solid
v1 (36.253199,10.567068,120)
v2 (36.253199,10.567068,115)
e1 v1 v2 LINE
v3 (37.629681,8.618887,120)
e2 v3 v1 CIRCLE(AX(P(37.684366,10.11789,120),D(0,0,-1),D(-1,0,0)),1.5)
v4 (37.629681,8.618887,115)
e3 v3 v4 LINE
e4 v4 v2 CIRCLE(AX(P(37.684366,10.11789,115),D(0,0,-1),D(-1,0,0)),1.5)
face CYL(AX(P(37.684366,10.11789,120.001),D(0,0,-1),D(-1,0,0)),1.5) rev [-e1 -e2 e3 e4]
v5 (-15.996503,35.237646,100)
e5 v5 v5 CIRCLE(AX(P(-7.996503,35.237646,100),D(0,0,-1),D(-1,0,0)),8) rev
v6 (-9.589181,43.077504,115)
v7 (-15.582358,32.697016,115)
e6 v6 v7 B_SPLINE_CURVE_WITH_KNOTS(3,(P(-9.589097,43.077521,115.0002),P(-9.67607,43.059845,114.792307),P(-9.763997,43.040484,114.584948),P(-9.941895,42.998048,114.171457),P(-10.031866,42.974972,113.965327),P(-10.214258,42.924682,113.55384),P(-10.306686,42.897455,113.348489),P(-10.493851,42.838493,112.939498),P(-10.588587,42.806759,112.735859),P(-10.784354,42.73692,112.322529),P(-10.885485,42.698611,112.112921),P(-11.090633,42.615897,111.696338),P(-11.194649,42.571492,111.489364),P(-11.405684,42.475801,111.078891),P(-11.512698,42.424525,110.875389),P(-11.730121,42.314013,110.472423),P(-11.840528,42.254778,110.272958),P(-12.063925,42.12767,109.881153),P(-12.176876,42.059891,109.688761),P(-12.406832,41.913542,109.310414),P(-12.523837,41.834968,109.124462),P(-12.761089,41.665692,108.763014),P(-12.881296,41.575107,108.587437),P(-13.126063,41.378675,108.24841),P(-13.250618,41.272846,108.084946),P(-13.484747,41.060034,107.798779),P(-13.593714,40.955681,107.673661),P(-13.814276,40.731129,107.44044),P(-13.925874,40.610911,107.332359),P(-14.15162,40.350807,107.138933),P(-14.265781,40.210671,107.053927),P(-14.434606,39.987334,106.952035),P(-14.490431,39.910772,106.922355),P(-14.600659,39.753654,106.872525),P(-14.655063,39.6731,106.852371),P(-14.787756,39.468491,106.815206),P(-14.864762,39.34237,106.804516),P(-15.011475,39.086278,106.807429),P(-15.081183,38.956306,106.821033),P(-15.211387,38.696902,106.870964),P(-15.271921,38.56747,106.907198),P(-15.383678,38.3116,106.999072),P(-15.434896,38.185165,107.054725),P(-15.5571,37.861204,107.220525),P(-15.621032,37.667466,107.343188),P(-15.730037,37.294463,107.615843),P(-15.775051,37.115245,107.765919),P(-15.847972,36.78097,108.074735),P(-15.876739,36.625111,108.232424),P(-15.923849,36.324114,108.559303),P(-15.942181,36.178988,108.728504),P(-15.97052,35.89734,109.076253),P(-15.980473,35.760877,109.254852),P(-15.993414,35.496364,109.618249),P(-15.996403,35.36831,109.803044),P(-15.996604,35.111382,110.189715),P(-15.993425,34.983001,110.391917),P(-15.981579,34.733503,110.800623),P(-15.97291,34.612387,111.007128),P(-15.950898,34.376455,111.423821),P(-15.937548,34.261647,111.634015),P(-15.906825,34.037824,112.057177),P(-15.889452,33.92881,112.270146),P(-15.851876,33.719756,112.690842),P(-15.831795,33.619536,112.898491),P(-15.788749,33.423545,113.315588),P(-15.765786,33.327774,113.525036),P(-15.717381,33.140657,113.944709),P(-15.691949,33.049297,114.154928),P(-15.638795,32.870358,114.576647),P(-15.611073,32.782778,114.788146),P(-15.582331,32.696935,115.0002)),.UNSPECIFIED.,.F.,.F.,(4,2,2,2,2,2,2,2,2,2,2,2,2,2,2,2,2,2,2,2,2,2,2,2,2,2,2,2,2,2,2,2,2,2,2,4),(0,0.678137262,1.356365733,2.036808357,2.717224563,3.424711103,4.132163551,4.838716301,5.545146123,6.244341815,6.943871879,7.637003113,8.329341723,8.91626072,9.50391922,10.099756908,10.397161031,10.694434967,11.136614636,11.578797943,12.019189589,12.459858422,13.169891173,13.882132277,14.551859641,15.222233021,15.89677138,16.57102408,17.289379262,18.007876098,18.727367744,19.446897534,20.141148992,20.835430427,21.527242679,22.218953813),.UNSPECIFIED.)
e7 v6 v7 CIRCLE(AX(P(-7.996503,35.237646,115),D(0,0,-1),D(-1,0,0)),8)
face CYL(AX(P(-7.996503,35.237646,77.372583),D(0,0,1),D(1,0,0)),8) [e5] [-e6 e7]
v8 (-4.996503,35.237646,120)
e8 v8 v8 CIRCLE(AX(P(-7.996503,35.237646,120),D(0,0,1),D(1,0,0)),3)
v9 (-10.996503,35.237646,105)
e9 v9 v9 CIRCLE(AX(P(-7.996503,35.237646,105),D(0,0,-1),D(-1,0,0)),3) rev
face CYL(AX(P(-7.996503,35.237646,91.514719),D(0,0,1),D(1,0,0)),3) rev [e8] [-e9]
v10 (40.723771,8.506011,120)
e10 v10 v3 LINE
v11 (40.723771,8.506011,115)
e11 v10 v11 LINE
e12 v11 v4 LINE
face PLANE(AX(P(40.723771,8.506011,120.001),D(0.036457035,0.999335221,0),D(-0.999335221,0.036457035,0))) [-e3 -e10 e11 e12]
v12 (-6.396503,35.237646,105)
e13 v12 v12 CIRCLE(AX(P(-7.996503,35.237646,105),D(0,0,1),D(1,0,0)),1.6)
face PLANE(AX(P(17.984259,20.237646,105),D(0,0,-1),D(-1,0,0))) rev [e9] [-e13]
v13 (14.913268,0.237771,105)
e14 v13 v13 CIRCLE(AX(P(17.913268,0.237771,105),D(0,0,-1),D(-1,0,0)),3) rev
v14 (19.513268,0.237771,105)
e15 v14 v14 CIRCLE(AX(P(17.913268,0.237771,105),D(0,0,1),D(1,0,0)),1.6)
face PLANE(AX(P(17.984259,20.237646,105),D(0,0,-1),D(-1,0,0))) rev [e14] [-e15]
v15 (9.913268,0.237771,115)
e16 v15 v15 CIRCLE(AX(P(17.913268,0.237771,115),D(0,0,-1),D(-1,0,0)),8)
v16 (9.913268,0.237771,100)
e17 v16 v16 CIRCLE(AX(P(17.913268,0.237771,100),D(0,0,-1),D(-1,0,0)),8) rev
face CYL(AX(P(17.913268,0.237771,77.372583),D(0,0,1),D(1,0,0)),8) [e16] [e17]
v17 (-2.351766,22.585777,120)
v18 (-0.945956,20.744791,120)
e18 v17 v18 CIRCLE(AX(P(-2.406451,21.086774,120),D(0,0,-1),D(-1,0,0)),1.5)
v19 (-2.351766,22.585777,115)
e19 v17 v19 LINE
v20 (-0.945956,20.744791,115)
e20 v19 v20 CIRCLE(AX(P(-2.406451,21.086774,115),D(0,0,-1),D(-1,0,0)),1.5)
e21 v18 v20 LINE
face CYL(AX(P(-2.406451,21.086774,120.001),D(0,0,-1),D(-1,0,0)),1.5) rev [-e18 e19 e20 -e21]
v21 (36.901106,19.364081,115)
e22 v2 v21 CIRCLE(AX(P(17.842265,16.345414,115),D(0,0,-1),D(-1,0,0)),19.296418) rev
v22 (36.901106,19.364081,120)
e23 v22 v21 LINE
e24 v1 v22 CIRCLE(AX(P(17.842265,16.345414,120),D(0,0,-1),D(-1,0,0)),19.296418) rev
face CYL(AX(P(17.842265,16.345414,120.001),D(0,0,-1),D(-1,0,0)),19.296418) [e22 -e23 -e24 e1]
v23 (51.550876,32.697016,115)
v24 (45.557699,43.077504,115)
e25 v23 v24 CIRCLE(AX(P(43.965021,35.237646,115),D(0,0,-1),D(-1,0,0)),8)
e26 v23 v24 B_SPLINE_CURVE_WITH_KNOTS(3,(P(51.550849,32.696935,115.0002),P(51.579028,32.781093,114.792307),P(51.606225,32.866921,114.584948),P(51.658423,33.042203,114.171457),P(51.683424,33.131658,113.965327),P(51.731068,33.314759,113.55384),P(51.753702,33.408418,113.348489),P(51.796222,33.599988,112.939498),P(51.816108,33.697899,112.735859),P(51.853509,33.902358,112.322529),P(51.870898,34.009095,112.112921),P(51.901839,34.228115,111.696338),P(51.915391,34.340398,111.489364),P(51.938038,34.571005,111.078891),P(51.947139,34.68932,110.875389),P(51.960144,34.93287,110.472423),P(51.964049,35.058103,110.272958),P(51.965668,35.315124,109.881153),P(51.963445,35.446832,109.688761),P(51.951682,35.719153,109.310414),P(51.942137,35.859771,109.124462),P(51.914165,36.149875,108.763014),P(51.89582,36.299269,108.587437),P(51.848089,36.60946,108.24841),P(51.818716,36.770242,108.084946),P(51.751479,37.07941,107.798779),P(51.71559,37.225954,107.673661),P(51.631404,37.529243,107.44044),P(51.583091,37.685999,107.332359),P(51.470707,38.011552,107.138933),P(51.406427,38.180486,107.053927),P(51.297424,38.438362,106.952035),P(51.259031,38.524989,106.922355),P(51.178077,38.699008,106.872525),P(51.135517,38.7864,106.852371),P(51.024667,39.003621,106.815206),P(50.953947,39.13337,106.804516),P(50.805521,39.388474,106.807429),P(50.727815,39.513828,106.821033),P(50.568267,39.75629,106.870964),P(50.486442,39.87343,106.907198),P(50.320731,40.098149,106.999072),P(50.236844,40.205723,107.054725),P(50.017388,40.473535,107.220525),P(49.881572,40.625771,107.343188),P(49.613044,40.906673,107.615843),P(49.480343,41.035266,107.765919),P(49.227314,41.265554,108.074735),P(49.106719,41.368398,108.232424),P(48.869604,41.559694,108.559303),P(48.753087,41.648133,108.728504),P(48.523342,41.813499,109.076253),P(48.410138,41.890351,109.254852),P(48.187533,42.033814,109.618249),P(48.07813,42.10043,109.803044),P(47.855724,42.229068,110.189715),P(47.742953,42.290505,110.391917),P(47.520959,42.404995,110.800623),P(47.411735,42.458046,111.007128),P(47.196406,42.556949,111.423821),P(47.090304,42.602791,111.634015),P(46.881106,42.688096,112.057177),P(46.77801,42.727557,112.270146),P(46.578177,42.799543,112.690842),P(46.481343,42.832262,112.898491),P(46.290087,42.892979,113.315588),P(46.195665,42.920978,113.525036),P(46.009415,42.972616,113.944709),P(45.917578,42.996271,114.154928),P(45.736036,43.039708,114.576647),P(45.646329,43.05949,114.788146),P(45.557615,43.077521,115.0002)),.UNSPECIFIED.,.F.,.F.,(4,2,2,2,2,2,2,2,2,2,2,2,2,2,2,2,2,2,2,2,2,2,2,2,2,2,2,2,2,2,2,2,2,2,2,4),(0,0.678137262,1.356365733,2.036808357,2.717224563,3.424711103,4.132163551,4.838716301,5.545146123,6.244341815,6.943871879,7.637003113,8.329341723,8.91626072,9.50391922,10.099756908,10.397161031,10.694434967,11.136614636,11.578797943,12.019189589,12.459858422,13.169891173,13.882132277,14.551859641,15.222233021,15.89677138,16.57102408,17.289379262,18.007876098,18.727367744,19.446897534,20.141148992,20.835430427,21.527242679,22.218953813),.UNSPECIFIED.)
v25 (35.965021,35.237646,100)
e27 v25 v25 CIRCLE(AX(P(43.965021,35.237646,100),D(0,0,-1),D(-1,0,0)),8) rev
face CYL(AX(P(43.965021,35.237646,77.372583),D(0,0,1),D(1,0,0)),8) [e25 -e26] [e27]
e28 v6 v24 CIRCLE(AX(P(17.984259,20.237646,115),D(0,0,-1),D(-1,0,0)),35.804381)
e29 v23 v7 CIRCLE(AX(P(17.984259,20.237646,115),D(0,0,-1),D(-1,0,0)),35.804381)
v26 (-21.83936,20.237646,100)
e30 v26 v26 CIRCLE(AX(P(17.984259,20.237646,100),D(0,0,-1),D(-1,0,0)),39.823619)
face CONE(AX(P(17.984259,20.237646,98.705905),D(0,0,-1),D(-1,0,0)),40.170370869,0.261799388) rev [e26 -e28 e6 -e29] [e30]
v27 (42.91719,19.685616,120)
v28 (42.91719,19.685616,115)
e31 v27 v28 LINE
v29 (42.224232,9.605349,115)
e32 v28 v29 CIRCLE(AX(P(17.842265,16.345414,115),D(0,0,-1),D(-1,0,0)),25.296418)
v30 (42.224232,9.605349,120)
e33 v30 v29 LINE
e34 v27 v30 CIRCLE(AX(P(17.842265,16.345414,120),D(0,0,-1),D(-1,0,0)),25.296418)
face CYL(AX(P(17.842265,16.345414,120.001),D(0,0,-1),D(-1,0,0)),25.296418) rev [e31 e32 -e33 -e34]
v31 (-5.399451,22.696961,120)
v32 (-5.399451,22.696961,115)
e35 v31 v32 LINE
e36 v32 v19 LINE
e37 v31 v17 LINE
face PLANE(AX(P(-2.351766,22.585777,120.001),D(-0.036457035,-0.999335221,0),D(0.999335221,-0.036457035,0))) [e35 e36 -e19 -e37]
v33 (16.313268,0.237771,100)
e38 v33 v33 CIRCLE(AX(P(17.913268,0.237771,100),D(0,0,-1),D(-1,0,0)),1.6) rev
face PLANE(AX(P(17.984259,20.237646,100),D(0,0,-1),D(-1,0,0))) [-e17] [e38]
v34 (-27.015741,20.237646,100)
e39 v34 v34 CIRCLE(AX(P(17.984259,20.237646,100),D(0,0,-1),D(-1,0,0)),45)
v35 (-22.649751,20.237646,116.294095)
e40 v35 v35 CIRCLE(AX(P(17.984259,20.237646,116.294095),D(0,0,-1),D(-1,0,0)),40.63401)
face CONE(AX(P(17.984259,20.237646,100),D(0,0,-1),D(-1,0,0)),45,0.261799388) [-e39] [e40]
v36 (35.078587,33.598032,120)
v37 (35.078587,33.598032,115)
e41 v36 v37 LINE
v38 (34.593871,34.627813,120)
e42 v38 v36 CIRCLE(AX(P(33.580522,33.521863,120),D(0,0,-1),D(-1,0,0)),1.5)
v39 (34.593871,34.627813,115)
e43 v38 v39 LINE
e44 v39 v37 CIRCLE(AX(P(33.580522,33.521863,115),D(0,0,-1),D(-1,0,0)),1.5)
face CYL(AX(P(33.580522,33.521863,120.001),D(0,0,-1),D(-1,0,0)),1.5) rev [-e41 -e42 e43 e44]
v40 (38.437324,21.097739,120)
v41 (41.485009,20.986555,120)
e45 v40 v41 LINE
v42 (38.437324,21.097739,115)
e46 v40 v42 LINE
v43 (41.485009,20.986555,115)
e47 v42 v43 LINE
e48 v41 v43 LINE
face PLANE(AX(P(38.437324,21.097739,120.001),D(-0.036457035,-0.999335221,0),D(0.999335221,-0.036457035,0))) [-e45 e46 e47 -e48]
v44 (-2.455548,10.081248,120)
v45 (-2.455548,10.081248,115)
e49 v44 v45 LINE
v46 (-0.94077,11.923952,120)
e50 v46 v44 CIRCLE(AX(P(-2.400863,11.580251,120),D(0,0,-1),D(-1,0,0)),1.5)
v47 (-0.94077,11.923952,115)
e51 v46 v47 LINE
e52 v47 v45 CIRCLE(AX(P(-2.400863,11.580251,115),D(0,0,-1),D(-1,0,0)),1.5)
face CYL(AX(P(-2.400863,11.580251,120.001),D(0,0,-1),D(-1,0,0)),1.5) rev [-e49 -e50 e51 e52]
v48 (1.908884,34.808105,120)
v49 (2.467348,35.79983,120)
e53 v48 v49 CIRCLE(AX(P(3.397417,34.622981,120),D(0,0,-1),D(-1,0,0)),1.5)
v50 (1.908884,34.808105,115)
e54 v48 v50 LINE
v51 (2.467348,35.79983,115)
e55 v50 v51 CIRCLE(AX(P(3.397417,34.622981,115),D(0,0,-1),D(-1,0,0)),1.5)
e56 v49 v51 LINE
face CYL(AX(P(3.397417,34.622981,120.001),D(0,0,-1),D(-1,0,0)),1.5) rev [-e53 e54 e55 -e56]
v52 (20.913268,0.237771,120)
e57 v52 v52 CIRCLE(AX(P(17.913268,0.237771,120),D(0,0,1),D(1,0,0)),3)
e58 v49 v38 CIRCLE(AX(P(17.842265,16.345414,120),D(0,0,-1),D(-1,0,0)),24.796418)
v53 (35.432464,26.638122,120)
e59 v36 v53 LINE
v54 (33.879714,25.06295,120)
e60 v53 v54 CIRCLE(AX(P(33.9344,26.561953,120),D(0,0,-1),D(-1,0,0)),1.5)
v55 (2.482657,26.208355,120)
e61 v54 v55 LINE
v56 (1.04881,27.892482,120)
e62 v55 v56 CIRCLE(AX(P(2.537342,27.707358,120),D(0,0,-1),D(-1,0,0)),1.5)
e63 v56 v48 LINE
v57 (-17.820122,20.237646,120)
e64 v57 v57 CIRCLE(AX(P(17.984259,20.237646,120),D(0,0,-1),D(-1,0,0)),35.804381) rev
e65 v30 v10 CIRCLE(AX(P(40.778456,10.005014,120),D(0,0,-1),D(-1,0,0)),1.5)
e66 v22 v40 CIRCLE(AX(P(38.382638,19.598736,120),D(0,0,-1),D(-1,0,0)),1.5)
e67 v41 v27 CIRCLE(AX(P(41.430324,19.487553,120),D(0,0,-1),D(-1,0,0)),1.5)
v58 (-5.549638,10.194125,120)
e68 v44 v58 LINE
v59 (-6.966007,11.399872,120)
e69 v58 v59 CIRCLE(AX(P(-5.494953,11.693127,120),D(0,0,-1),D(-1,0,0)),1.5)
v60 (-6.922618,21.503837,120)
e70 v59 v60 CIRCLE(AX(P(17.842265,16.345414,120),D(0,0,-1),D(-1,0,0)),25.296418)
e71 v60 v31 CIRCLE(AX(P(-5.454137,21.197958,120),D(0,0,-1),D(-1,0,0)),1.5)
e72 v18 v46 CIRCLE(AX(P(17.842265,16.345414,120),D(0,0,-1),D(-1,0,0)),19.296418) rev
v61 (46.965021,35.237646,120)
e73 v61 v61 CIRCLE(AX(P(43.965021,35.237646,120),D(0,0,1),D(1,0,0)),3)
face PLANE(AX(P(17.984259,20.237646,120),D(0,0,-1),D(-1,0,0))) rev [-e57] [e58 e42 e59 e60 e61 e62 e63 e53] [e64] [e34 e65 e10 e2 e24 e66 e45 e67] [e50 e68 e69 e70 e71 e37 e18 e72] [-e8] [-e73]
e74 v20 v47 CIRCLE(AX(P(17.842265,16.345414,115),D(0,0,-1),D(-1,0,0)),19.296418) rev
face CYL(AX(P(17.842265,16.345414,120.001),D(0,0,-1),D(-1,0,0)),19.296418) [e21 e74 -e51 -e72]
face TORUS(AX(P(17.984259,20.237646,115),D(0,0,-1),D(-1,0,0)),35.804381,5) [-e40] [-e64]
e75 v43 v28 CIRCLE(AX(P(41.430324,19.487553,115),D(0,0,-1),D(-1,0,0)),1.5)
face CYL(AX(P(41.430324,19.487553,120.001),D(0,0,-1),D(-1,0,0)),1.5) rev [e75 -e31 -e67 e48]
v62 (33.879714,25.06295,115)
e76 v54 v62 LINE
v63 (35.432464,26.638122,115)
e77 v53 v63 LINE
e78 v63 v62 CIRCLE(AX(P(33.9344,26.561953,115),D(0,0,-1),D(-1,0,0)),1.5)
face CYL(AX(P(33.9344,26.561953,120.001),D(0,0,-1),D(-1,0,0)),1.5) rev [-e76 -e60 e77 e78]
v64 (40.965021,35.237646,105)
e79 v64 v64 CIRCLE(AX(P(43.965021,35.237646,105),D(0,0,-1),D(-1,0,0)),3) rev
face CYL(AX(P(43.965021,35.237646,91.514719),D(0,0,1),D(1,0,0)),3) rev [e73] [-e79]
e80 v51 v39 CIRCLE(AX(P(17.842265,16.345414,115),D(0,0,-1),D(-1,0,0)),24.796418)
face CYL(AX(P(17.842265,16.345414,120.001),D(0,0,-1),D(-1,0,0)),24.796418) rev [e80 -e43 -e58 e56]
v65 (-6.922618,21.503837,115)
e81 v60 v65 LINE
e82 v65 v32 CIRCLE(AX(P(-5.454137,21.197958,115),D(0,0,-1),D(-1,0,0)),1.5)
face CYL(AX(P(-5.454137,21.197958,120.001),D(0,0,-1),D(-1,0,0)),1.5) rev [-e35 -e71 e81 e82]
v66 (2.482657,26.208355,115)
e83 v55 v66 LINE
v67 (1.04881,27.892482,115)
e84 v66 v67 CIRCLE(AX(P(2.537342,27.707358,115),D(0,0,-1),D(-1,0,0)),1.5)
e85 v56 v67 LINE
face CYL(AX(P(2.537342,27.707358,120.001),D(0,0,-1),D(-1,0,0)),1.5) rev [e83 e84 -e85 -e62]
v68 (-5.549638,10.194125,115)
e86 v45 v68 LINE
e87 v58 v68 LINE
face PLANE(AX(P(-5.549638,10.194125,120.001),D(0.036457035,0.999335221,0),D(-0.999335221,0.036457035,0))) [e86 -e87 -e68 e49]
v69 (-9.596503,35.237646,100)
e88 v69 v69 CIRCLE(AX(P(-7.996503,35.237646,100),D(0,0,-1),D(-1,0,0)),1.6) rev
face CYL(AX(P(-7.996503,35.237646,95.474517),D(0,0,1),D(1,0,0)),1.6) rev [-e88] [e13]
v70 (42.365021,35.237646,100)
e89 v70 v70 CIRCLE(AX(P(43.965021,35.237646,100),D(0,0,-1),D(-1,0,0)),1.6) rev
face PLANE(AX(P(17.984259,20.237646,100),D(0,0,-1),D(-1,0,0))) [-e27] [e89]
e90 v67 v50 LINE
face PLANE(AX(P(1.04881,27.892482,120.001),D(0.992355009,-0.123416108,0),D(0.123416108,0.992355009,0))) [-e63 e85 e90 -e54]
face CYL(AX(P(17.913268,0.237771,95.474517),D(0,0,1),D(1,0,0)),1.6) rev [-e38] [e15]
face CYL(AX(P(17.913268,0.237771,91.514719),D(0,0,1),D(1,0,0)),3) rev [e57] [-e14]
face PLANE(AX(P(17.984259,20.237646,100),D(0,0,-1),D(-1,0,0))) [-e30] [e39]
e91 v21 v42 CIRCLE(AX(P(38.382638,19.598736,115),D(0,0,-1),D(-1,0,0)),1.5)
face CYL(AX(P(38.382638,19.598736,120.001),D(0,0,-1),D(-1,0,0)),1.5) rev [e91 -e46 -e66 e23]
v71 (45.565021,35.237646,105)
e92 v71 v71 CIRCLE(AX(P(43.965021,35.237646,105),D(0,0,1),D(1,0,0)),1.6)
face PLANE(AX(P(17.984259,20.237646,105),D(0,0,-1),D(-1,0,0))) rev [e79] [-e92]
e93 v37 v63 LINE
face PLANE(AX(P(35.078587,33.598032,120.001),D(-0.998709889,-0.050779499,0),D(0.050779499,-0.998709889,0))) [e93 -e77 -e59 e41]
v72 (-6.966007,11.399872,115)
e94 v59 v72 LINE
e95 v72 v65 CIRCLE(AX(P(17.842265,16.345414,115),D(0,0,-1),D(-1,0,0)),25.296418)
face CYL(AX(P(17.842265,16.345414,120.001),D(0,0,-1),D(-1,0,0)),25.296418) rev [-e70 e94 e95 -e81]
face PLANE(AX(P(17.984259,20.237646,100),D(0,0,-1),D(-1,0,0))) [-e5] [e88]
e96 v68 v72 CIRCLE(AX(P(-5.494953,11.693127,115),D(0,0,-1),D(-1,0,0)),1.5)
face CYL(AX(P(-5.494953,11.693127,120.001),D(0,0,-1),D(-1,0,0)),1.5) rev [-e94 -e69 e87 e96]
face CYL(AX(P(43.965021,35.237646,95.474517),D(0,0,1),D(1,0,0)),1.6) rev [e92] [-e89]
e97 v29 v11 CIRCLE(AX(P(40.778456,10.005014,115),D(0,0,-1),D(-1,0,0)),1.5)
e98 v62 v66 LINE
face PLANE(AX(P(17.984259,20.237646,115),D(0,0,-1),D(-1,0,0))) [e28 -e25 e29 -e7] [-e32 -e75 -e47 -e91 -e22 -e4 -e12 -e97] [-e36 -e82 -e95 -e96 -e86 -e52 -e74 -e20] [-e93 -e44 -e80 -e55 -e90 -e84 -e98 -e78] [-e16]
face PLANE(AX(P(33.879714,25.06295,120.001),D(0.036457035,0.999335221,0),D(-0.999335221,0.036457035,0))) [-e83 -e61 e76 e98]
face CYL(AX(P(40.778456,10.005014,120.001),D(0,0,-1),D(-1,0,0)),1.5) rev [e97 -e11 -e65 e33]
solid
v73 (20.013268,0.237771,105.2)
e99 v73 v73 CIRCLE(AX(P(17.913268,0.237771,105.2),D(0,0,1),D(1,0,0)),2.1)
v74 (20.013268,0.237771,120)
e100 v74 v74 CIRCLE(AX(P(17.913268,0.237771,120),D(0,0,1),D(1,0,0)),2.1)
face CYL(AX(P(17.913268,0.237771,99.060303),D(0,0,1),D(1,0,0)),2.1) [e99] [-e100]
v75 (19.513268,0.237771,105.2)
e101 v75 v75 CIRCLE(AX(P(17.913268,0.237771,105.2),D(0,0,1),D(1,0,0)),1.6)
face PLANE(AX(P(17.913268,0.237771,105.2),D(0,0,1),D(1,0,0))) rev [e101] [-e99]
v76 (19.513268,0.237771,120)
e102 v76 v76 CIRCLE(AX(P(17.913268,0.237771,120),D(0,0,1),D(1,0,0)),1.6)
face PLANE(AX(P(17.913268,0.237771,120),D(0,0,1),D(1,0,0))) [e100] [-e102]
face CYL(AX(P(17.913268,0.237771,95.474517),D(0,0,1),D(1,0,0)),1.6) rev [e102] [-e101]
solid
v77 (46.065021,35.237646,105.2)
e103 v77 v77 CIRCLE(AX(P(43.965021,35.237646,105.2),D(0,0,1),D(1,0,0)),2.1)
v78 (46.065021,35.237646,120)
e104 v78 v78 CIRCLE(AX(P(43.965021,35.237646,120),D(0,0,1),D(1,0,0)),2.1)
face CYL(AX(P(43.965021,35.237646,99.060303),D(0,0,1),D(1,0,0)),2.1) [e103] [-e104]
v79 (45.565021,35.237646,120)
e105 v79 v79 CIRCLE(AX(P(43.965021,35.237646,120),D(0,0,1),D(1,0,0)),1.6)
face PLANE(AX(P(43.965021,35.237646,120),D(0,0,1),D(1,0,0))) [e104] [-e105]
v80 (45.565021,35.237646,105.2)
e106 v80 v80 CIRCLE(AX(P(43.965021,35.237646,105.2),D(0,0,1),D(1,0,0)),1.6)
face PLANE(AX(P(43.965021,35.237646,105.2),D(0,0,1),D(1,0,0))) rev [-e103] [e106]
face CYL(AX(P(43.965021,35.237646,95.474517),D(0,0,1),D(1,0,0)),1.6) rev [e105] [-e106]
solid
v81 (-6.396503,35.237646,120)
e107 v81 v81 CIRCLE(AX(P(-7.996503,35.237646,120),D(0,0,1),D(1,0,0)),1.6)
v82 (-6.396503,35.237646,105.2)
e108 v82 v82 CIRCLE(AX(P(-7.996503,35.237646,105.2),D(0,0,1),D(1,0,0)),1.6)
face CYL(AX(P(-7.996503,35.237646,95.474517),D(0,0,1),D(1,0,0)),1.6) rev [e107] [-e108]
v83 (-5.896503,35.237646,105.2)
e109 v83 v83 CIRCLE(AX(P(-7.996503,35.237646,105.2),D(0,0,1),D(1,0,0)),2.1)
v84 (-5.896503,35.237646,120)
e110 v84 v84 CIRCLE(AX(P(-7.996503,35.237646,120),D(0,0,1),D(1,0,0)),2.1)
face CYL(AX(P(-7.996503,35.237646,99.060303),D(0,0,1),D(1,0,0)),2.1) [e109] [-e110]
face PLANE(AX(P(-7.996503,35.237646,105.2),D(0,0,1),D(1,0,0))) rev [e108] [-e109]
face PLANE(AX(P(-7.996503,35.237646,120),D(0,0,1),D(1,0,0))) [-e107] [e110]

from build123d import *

# Parameters (mm, degrees)
CROQUIS2_R                   = 45
SALIENTE_EXTRUIR2_DEPTH      = 20
SALIENTE_EXTRUIR2_DRAFT      = -15
CORTAR_EXTRUIR2_REACH        = 152.409
VACIADO1_T                   = -5
CROQUIS3_R                   = 8
SALIENTE_EXTRUIR4_DEPTH      = 20
CROQUIS4_R                   = 3
CORTAR_EXTRUIR3_DEPTH        = 15
CROQUIS5_R                   = 1.6
CORTAR_EXTRUIR4_DEPTH        = 20
REDONDEO1_R                  = 5
EXTRUIR_L_MINA2_START        = -15
CROQUIS6_R                   = 2.1
CROQUIS6_R_2                 = 1.6
EXTRUIR_L_MINA2_DEPTH        = 15
CROQUIS8_R                   = 2.1
CROQUIS8_R_2                 = 1.6
CORTAR_EXTRUIR_L_MINA2_DEPTH = 0.2


with BuildPart() as part:
    # Croquis2 → Saliente-Extruir2 (with draft: the straight prism first)
    with BuildSketch(Plane(origin=(23.769597459, 178.821373691, 100), x_dir=(-0.9993352213470394, 0.03645703464715521, 0), z_dir=(0, 0, -1))):
        with Locations((0, -158.689221395)):
            Circle(CROQUIS2_R)
    extrude(amount=-SALIENTE_EXTRUIR2_DEPTH)
    # Saliente-Extruir2: the draft: its side faces are tilted about the plane it starts from
    saliente_extruir2_sides = [part.faces().sort_by_distance(p)[0] for p in [
        (62.954343977, 18.597078944, 110),
    ]]
    draft(saliente_extruir2_sides, Plane(origin=(23.769597459, 178.821373691, 100), x_dir=(-0.9993352213470394, 0.03645703464715521, 0), z_dir=(0, 0, -1)), SALIENTE_EXTRUIR2_DRAFT)

    # Croquis1 → Cortar-Extruir2 (cut, up to next)
    with BuildSketch(Plane.XY, mode=Mode.PRIVATE) as cortar_extruir2_sk1:
        with BuildLine():
            Line((38.437323763, 21.097738839), (41.485009265, 20.986555351))
            ThreePointArc((41.485009265, 20.986555351), (42.438890024, 20.597865086), (42.9171898, 19.685616244))
            ThreePointArc((42.9171898, 19.685616244), (43.079122698, 14.610532204), (42.224232033, 9.605348669))
            ThreePointArc((42.224232033, 9.605348669), (41.664976847, 8.795021667), (40.723770664, 8.506011054))
            Line((40.723770664, 8.506011054), (37.629680564, 8.618887441))
            ThreePointArc((37.629680564, 8.618887441), (36.459298216, 9.252321882), (36.253198954, 10.567067913))
            ThreePointArc((36.253198954, 10.567067913), (37.086559565, 14.928056242), (36.901106215, 19.364081058))
            ThreePointArc((36.901106215, 19.364081058), (37.259978414, 20.593539999), (38.437323763, 21.097738839))
        make_face()
    cortar_extruir2_tool1 = extrude(cortar_extruir2_sk1.sketch, amount=CORTAR_EXTRUIR2_REACH, mode=Mode.PRIVATE) & part.part
    # Croquis1 → Cortar-Extruir2 (cut, up to next)
    with BuildSketch(Plane.XY, mode=Mode.PRIVATE) as cortar_extruir2_sk2:
        with BuildLine():
            Line((35.078587083, 33.598032009), (35.432464356, 26.638122196))
            ThreePointArc((35.432464356, 26.638122196), (35.002635315, 25.508922895), (33.879713971, 25.062950115))
            Line((33.879713971, 25.062950115), (2.482656554, 26.208355166))
            ThreePointArc((2.482656554, 26.208355166), (1.395216267, 26.734964782), (1.048809592, 27.89248216))
            Line((1.048809592, 27.89248216), (1.908884166, 34.808105448))
            ThreePointArc((1.908884166, 34.808105448), (2.090402014, 35.358992606), (2.467347826, 35.799829589))
            ThreePointArc((2.467347826, 35.799829589), (18.746269299, 41.125348575), (34.59387052, 34.627812706))
            ThreePointArc((34.59387052, 34.627812706), (34.937692473, 34.160681188), (35.078587083, 33.598032009))
        make_face()
    cortar_extruir2_tool2 = extrude(cortar_extruir2_sk2.sketch, amount=CORTAR_EXTRUIR2_REACH, mode=Mode.PRIVATE) & part.part
    # Croquis1 → Cortar-Extruir2 (cut, up to next)
    with BuildSketch(Plane.XY, mode=Mode.PRIVATE) as cortar_extruir2_sk3:
        with BuildLine():
            Line((-2.351765549, 22.585777298), (-5.399451051, 22.696960786))
            ThreePointArc((-5.399451051, 22.696960786), (-6.379118323, 22.378808841), (-6.922618225, 21.503836566))
            ThreePointArc((-6.922618225, 21.503836566), (-7.453919699, 16.454042608), (-6.966007221, 11.399871886))
            ThreePointArc((-6.966007221, 11.399871886), (-6.467283625, 10.550948457), (-5.549638316, 10.19412455))
            Line((-5.549638316, 10.19412455), (-2.455548217, 10.081248162))
            ThreePointArc((-2.455548217, 10.081248162), (-1.242121436, 10.627718179), (-0.940770277, 11.923951766))
            ThreePointArc((-0.940770277, 11.923951766), (-1.454149603, 16.3340709), (-0.945955632, 20.74479057))
            ThreePointArc((-0.945955632, 20.74479057), (-1.214288606, 21.997130762), (-2.351765549, 22.585777298))
        make_face()
    cortar_extruir2_tool3 = extrude(cortar_extruir2_sk3.sketch, amount=CORTAR_EXTRUIR2_REACH, mode=Mode.PRIVATE) & part.part
    add(cortar_extruir2_tool1.solids().sort_by_distance((39.833877, 14.778214, 0))[0], mode=Mode.SUBTRACT)
    add(cortar_extruir2_tool2.solids().sort_by_distance((18.430411, 32.46725, 0))[0], mode=Mode.SUBTRACT)
    add(cortar_extruir2_tool3.solids().sort_by_distance((-4.205083, 16.384812, 0))[0], mode=Mode.SUBTRACT)

    # Vaciado1
    vaciado1_openings = [part.faces().sort_by_distance(p)[0] for p in [
        (37.259978414, 20.593539999, 110),
        (37.086559565, 14.928056242, 110),
        (36.459298216, 9.252321882, 110),
        (39.176725614, 8.562449247, 110),
        (41.664976847, 8.795021667, 110),
        (43.079122698, 14.610532204, 110),
        (42.438890024, 20.597865086, 110),
        (39.961166514, 21.042147095, 110),
        (-4.011135357, 16.390221893, 100),
        (35.002635315, 25.508922895, 110),
        (35.25552572, 30.118077102, 110),
        (34.937692473, 34.160681188, 110),
        (18.746269299, 41.125348575, 110),
        (2.090402014, 35.358992606, 110),
        (1.478846879, 31.350293804, 110),
        (1.395216267, 26.734964782, 110),
        (18.181185262, 25.635652641, 110),
        (-1.454149603, 16.3340709, 110),
        (-1.214288606, 21.997130762, 110),
        (-3.8756083, 22.641369042, 110),
        (-6.379118323, 22.378808841, 110),
        (-7.453919699, 16.454042608, 110),
        (-6.467283625, 10.550948457, 110),
        (-4.002593266, 10.137686356, 110),
        (-1.242121436, 10.627718179, 110),
    ]]
    offset(amount=VACIADO1_T, openings=vaciado1_openings, kind=Kind.INTERSECTION)

    # Croquis3 → Saliente-Extruir4 (add)
    with BuildSketch(Plane.XY.offset(120)):
        with Locations(Location((43.96502113, 35.237645503, 0), (0, 0, 341.483441436))):
            Circle(CROQUIS3_R)
        with Locations(Location((-7.996503097, 35.237645503, 0), (0, 0, 101.483441436))):
            Circle(CROQUIS3_R)
        with Locations(Location((17.913267573, 0.237771498, 0), (0, 0, 180))):
            Circle(CROQUIS3_R)
    extrude(amount=-SALIENTE_EXTRUIR4_DEPTH)

    # Croquis4 → Cortar-Extruir3 (cut)
    with BuildSketch(Plane.XY.offset(120)):
        with Locations((-7.996503097, 35.237645503)):
            Circle(CROQUIS4_R)
        with Locations((43.96502113, 35.237645503)):
            Circle(CROQUIS4_R)
        with Locations((17.913267573, 0.237771498)):
            Circle(CROQUIS4_R)
    extrude(amount=-CORTAR_EXTRUIR3_DEPTH, mode=Mode.SUBTRACT)

    # Croquis5 → Cortar-Extruir4 (cut)
    with BuildSketch(Plane.XY.offset(120)):
        with Locations(Location((-7.996503097, 35.237645503, 0), (0, 0, 180))):
            Circle(CROQUIS5_R)
        with Locations(Location((43.96502113, 35.237645503, 0), (0, 0, 180))):
            Circle(CROQUIS5_R)
        with Locations(Location((17.913267573, 0.237771498, 0), (0, 0, 180))):
            Circle(CROQUIS5_R)
    extrude(amount=-CORTAR_EXTRUIR4_DEPTH, mode=Mode.SUBTRACT)

    # Redondeo1
    redondeo1_edges = [part.edges().sort_by_distance(p)[0] for p in [
        (57.598922667, 18.792451603, 120),
    ]]
    fillet(redondeo1_edges, radius=REDONDEO1_R)

    # Croquis6 → Extruir-Lámina2 (add)
    # profile 1 of 3: a face of its own
    with BuildSketch(Plane.XY.offset(120).offset(EXTRUIR_L_MINA2_START)):
        with Locations((-7.996503097, 35.237645503)):
            Circle(CROQUIS6_R)
        with Locations((-7.996503097, 35.237645503)):
            Circle(CROQUIS6_R_2, mode=Mode.SUBTRACT)
    # profile 2 of 3: a face of its own
    with BuildSketch(Plane.XY.offset(120).offset(EXTRUIR_L_MINA2_START)):
        with Locations((43.96502113, 35.237645503)):
            Circle(CROQUIS6_R)
        with Locations((43.96502113, 35.237645503)):
            Circle(CROQUIS6_R_2, mode=Mode.SUBTRACT)
    # profile 3 of 3: a face of its own
    with BuildSketch(Plane.XY.offset(120).offset(EXTRUIR_L_MINA2_START)):
        with Locations((17.913267573, 0.237771498)):
            Circle(CROQUIS6_R)
        with Locations((17.913267573, 0.237771498)):
            Circle(CROQUIS6_R_2, mode=Mode.SUBTRACT)
    extrude(amount=EXTRUIR_L_MINA2_DEPTH)

    # Croquis8 → Cortar-Extruir-Lámina2 (cut)
    # profile 1 of 3: a face of its own
    with BuildSketch(Plane.XY.offset(105)):
        with Locations((-7.996503097, 35.237645503)):
            Circle(CROQUIS8_R)
        with Locations((-7.996503097, 35.237645503)):
            Circle(CROQUIS8_R_2, mode=Mode.SUBTRACT)
    # profile 2 of 3: a face of its own
    with BuildSketch(Plane.XY.offset(105)):
        with Locations((43.96502113, 35.237645503)):
            Circle(CROQUIS8_R)
        with Locations((43.96502113, 35.237645503)):
            Circle(CROQUIS8_R_2, mode=Mode.SUBTRACT)
    # profile 3 of 3: a face of its own
    with BuildSketch(Plane.XY.offset(105)):
        with Locations((17.913267573, 0.237771498)):
            Circle(CROQUIS8_R)
        with Locations((17.913267573, 0.237771498)):
            Circle(CROQUIS8_R_2, mode=Mode.SUBTRACT)
    extrude(amount=CORTAR_EXTRUIR_L_MINA2_DEPTH, mode=Mode.SUBTRACT)


with BuildPart() as cortar_extruir_l_mina2_piece_1:
    # of the separate pieces the step leaves, piece 1, a body of its own (cortar_extruir_l_mina2_pieces)
    add(part.part.solids().sort_by_distance((-22.622738704, 21.719041026, 116.294095226))[0])


with BuildPart() as cortar_extruir_l_mina2_piece_2:
    # of the separate pieces the step leaves, piece 2, a body of its own (cortar_extruir_l_mina2_pieces)
    add(part.part.solids().sort_by_distance((46.06502113, 35.237645503, 105.2))[0])


with BuildPart() as cortar_extruir_l_mina2_piece_3:
    # of the separate pieces the step leaves, piece 3, a body of its own (cortar_extruir_l_mina2_pieces)
    add(part.part.solids().sort_by_distance((20.013267573, 0.237771498, 105.2))[0])


with BuildPart() as cortar_extruir_l_mina2_piece_4:
    # of the separate pieces the step leaves, piece 4, a body of its own (cortar_extruir_l_mina2_pieces)
    add(part.part.solids().sort_by_distance((-5.896503097, 35.237645503, 105.2))[0])


solid = Compound([cortar_extruir_l_mina2_piece_1.part, cortar_extruir_l_mina2_piece_2.part, cortar_extruir_l_mina2_piece_3.part, cortar_extruir_l_mina2_piece_4.part])
